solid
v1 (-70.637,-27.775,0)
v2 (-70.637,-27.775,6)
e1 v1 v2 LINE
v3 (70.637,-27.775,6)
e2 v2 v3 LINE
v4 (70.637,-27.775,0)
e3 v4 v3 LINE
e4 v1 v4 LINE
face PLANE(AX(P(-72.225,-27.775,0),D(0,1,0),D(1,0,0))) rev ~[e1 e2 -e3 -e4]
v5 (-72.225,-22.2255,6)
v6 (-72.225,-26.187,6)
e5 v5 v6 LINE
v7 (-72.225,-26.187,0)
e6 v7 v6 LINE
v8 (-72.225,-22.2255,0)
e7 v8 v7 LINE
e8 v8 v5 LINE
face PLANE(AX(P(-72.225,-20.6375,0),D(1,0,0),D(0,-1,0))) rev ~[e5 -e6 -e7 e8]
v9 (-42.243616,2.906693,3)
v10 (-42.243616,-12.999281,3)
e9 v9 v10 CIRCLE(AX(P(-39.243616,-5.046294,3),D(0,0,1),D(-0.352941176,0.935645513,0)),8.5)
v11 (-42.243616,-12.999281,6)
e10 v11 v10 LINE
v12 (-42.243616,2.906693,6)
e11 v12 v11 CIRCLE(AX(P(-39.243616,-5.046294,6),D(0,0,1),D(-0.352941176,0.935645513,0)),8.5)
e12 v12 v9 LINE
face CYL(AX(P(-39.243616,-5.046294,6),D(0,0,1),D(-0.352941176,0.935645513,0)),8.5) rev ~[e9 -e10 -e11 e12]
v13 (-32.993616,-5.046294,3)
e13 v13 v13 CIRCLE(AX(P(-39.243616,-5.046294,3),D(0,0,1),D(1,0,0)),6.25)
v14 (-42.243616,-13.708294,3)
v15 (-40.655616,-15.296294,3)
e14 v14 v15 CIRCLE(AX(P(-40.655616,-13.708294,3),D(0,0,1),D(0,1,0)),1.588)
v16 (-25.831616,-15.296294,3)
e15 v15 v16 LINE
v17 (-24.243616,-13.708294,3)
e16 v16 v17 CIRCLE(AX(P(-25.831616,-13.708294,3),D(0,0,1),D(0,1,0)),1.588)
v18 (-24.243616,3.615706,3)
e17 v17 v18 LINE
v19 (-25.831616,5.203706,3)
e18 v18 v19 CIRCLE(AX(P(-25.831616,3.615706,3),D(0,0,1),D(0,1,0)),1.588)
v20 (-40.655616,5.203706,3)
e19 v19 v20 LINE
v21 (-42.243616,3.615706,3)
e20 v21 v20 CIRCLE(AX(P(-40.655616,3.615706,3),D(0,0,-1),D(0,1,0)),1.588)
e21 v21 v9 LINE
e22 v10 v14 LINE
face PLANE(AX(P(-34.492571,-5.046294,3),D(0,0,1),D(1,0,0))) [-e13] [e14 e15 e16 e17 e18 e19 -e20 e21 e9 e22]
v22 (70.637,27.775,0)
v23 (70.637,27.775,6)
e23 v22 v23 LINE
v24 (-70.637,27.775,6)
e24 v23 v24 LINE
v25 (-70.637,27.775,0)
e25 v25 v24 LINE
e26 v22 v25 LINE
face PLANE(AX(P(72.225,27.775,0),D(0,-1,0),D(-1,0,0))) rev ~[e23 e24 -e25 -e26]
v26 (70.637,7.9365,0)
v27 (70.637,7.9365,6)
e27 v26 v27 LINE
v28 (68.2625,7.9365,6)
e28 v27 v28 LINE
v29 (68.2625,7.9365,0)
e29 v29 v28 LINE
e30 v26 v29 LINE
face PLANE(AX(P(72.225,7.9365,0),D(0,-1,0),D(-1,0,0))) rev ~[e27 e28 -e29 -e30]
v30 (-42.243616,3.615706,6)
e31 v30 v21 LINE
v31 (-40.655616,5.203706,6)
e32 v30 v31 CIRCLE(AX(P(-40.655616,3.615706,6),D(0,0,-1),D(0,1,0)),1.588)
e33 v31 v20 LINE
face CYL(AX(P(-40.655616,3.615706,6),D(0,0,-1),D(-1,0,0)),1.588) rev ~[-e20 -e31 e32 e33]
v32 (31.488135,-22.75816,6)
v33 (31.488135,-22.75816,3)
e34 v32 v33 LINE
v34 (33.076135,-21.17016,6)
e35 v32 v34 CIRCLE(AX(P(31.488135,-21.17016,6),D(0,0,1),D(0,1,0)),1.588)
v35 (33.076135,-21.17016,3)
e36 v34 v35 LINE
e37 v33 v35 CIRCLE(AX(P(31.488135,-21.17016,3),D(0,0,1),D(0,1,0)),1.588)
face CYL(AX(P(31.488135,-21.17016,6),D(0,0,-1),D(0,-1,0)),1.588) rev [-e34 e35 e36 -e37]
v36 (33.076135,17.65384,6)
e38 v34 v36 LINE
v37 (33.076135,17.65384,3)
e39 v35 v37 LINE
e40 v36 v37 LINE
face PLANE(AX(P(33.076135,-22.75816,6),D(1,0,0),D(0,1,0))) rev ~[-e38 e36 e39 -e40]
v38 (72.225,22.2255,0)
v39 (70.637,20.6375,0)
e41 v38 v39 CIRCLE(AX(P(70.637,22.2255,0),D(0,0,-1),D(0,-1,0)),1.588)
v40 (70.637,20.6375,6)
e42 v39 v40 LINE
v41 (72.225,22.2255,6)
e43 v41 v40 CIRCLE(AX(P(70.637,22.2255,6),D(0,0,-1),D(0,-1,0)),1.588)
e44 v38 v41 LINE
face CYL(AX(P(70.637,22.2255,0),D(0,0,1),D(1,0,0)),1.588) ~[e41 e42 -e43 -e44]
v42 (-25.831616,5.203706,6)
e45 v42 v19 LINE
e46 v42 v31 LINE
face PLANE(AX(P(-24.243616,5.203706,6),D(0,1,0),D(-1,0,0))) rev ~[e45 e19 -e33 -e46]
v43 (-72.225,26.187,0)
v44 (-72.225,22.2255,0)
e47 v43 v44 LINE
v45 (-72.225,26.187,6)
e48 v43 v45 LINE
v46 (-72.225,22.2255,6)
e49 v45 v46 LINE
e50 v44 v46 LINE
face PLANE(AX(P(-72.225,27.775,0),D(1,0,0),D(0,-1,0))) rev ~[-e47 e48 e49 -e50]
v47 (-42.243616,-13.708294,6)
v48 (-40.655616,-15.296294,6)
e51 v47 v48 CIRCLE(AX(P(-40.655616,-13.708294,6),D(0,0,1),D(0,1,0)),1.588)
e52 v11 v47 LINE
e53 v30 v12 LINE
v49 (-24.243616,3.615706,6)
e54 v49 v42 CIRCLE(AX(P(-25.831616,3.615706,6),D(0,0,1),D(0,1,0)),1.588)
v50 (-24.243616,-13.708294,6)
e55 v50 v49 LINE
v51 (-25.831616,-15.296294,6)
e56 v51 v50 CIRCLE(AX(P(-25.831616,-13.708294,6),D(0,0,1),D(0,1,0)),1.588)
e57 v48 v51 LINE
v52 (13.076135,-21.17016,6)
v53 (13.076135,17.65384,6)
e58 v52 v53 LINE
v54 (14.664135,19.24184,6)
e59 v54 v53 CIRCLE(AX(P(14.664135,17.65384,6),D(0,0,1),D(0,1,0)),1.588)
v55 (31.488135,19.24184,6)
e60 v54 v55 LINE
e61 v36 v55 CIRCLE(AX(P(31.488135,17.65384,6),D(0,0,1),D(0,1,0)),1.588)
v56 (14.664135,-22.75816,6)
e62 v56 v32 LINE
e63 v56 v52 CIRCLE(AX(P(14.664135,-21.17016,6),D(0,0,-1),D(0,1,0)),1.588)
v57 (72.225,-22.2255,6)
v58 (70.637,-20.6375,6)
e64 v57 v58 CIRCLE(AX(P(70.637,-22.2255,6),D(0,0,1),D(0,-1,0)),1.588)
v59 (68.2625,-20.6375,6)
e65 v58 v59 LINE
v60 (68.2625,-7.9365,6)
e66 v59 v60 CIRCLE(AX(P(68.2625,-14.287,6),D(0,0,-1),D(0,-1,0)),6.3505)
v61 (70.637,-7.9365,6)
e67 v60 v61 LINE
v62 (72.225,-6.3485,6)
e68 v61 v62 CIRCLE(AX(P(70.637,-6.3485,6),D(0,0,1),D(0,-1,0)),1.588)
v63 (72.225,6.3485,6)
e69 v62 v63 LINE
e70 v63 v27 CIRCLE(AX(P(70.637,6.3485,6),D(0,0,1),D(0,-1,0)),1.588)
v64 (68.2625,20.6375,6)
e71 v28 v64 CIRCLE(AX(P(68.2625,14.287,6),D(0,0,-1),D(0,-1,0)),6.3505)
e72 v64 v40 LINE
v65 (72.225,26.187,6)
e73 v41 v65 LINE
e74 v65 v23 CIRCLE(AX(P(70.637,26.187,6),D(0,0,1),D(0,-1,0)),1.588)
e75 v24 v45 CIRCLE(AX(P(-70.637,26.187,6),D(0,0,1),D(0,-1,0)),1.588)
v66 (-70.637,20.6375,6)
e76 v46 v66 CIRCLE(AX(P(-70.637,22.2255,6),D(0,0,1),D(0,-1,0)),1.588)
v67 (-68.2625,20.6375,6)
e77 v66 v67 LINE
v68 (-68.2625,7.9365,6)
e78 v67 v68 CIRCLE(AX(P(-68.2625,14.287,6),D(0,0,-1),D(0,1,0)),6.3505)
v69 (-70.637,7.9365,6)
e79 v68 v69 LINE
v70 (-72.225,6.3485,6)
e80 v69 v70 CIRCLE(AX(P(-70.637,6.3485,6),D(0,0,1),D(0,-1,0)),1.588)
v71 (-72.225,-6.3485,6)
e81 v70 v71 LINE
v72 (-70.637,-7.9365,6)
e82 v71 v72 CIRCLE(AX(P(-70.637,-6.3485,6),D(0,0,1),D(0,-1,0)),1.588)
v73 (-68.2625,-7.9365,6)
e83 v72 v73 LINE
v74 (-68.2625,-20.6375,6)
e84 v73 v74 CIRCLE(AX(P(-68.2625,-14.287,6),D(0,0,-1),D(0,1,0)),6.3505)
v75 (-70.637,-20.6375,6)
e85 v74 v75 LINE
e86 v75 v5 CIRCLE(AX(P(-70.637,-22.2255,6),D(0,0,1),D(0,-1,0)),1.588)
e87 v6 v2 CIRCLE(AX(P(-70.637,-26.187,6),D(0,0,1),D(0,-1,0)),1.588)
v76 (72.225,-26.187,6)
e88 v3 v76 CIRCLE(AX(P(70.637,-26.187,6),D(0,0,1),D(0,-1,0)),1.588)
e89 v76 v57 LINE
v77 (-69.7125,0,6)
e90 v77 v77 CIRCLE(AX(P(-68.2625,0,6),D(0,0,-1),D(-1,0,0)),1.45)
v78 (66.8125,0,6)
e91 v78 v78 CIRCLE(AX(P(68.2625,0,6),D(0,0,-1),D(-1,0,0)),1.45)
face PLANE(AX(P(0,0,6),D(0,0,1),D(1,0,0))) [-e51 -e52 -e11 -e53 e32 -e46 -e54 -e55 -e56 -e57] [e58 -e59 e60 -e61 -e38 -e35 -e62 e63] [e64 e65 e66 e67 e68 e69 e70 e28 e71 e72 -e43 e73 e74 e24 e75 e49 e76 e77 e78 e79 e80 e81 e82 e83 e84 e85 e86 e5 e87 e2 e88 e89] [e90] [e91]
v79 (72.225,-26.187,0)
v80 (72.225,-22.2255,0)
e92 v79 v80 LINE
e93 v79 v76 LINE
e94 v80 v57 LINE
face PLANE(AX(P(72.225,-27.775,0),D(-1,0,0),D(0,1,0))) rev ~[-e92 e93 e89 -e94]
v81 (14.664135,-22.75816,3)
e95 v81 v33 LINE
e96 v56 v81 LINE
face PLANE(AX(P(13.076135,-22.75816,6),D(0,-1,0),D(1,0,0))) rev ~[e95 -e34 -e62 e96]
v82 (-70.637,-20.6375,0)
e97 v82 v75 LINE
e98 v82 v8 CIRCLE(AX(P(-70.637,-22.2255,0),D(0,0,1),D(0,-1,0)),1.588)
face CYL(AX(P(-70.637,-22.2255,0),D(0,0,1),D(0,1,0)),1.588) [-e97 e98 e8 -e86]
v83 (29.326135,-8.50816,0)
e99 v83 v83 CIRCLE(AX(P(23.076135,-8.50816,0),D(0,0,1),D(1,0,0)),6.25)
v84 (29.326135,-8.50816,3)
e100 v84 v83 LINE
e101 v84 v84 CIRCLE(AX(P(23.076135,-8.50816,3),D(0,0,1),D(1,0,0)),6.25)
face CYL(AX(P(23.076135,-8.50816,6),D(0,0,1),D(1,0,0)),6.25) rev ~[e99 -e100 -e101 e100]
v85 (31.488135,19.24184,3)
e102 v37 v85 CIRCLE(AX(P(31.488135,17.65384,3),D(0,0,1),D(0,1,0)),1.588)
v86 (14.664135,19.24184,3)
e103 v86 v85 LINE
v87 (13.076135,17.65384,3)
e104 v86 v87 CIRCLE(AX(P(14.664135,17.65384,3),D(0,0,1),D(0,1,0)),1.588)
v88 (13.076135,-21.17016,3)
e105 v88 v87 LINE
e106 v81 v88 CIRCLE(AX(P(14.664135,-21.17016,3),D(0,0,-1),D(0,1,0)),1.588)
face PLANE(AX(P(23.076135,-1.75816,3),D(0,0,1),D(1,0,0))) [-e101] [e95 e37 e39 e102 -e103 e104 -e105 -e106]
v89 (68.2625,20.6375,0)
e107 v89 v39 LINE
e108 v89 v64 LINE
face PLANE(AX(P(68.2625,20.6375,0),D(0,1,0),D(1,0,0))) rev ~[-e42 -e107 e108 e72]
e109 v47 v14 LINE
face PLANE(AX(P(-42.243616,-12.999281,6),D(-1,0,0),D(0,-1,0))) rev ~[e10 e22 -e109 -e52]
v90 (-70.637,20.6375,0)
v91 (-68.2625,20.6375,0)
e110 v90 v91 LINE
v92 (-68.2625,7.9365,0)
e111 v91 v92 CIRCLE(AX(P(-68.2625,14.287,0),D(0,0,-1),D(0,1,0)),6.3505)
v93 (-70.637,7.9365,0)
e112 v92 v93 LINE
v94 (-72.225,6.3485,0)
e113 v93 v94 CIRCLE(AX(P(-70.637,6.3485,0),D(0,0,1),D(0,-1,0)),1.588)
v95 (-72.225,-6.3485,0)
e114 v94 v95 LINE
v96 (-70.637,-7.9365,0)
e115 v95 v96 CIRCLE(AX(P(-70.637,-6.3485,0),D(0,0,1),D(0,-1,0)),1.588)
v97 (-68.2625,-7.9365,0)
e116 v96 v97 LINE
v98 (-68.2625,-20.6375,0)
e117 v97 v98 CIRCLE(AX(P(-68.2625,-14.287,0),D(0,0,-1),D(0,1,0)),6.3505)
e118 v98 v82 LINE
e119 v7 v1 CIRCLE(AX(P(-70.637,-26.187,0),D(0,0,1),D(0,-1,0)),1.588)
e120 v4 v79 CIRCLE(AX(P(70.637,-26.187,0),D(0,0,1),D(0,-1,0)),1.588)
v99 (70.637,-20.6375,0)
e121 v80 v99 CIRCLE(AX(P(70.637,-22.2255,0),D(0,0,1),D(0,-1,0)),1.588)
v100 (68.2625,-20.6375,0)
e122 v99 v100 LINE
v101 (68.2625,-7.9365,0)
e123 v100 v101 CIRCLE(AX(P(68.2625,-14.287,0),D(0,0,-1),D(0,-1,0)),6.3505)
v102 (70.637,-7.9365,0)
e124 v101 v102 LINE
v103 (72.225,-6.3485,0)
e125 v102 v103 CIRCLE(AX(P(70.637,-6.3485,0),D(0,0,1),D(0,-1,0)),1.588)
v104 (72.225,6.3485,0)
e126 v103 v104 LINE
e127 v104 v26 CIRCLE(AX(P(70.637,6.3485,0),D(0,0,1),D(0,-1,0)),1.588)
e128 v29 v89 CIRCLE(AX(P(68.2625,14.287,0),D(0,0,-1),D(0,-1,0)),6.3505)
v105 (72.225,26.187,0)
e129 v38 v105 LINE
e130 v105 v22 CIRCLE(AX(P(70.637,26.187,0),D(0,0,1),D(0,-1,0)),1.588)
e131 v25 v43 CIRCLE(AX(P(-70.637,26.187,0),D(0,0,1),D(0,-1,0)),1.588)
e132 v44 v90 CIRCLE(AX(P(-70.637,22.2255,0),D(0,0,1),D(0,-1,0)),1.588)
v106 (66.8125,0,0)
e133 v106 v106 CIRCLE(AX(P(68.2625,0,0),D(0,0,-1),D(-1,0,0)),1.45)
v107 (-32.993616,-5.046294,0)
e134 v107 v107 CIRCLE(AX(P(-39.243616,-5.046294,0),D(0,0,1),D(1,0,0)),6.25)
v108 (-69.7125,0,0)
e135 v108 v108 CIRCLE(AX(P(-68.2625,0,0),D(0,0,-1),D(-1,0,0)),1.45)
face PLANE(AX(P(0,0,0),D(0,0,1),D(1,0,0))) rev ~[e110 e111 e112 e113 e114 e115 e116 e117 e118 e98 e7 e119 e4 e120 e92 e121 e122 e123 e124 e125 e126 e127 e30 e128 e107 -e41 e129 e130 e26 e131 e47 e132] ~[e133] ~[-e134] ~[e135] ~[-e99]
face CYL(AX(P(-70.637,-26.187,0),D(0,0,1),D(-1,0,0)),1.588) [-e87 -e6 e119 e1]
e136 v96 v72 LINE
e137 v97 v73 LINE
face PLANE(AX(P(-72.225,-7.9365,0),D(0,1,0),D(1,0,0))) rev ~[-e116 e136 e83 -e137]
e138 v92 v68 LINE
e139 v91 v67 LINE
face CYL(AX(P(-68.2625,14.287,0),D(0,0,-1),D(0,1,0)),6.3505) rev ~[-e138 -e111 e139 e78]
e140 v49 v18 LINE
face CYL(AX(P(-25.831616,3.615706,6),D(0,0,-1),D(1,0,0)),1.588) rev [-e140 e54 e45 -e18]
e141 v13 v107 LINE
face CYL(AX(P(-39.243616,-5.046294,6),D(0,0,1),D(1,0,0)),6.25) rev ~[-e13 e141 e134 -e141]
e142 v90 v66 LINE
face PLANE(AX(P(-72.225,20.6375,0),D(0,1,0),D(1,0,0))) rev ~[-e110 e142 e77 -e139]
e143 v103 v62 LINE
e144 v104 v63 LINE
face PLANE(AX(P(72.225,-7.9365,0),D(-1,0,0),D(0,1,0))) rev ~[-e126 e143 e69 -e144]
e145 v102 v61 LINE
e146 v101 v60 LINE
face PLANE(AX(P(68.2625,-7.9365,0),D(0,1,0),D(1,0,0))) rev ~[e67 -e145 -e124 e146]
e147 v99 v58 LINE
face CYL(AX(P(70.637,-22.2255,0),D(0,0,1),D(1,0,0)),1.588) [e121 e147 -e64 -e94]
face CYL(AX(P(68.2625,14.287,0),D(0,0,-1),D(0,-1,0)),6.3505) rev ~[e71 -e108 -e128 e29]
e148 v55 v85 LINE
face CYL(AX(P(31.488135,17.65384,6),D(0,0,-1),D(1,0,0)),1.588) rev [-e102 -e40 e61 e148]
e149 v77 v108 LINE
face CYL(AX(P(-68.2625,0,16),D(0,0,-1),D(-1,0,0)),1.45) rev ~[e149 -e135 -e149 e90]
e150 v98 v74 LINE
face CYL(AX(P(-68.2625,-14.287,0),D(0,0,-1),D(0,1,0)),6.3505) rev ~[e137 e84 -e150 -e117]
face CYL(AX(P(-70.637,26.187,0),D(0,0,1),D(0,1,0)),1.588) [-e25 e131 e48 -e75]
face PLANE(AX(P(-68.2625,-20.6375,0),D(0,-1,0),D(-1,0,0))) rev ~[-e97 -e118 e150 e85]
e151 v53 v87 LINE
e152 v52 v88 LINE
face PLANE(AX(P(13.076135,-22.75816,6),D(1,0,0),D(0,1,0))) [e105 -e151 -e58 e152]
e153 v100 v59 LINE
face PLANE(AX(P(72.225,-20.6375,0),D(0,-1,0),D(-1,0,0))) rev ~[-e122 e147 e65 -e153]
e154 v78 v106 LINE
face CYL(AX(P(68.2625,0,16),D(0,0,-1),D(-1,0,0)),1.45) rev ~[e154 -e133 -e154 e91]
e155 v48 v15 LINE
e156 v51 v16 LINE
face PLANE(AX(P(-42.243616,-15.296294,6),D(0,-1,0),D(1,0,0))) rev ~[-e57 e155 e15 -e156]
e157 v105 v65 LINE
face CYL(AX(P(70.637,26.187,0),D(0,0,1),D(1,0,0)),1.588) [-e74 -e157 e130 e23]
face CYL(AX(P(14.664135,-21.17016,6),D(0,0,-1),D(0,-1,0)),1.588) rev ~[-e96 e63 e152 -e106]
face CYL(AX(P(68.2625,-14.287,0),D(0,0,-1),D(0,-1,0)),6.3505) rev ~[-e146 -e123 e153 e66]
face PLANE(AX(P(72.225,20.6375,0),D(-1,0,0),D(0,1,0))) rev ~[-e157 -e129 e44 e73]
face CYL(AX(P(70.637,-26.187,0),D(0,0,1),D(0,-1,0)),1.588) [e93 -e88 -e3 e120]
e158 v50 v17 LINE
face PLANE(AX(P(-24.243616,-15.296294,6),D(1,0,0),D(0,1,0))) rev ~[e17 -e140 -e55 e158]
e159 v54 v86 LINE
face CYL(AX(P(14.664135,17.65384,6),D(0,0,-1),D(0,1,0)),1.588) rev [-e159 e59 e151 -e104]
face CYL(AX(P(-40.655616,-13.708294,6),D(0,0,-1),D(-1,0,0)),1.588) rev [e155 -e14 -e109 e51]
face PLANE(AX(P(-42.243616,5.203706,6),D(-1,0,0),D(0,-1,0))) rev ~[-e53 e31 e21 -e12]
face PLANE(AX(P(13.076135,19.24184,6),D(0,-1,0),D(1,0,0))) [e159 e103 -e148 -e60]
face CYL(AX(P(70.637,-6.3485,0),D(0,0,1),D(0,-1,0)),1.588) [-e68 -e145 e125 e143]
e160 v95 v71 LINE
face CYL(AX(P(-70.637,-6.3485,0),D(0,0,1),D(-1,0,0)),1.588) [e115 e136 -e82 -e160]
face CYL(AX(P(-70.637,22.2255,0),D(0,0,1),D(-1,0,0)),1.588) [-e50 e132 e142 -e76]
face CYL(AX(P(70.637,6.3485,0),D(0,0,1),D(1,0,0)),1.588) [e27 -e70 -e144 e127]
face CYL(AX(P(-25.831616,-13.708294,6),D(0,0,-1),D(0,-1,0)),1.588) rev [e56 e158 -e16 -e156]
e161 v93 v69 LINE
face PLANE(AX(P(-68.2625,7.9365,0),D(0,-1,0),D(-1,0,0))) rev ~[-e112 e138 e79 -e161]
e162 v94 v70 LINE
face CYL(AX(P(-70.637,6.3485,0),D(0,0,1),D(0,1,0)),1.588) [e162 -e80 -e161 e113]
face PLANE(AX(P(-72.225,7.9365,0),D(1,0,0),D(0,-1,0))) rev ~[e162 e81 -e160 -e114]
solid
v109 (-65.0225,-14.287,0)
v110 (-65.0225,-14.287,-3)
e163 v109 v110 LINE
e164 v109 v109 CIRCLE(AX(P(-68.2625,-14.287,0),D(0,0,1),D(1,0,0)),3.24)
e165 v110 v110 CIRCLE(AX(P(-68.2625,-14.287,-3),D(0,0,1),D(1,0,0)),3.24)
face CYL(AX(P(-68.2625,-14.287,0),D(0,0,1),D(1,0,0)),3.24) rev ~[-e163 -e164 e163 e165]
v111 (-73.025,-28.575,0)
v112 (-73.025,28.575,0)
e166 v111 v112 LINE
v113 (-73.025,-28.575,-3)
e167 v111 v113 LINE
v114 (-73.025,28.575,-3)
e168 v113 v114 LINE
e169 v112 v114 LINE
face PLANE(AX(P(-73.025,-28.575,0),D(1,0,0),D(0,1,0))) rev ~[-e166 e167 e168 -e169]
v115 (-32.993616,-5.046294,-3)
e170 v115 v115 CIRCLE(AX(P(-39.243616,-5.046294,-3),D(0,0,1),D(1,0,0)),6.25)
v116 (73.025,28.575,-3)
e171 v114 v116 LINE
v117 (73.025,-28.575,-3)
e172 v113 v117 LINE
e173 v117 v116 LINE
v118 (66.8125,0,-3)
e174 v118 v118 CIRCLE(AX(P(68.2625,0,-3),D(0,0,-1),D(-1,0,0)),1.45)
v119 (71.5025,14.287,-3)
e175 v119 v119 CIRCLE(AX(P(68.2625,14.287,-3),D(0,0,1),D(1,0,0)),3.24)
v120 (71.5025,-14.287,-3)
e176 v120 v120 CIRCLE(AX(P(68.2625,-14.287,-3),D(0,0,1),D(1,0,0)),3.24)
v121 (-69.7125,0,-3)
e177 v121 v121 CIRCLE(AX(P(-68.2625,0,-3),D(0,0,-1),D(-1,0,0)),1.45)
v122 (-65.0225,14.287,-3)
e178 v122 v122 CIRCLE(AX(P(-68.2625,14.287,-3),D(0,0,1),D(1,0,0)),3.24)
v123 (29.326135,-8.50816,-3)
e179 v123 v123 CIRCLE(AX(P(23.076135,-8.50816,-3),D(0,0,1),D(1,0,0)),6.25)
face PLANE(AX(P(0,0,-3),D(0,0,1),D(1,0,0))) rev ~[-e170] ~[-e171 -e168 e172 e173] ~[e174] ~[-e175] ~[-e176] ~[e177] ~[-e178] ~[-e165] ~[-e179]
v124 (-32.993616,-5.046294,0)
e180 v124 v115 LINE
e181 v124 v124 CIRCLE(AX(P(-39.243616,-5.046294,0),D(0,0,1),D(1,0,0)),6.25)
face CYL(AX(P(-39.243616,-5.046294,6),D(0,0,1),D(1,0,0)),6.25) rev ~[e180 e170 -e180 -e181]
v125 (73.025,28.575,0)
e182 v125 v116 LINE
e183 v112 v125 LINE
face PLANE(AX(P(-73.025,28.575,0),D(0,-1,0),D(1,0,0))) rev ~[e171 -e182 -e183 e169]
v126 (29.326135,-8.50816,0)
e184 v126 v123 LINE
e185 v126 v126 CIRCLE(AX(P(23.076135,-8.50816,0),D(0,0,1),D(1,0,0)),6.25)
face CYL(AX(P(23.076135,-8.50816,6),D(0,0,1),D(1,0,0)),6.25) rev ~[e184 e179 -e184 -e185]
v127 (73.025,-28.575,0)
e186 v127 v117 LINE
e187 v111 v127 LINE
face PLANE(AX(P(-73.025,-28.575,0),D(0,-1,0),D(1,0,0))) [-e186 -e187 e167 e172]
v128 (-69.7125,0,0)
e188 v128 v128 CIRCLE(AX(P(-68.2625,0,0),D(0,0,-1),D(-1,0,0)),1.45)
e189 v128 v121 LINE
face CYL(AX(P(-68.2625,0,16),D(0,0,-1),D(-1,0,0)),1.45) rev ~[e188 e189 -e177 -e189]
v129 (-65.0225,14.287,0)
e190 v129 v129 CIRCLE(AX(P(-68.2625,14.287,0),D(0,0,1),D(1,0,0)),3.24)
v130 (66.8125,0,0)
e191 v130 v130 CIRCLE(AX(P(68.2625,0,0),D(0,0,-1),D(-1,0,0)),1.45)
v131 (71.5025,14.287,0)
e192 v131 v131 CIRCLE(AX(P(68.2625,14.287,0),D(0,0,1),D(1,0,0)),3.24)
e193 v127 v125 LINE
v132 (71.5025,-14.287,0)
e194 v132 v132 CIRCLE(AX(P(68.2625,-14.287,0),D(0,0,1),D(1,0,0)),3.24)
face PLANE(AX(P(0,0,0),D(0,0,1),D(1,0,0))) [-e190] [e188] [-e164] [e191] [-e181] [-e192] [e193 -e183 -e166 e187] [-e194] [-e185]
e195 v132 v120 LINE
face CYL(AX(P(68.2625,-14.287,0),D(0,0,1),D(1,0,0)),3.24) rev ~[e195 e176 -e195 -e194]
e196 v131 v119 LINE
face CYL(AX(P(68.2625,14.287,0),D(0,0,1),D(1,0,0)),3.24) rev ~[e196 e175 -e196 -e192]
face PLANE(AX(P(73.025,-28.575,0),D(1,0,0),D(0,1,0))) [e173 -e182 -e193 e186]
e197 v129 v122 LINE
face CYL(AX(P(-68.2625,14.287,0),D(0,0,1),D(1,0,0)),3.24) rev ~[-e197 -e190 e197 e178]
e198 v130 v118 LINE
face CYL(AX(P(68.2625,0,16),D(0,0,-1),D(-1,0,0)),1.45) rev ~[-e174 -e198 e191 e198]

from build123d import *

# Parameters (mm, degrees)
F0_W        = 146.05
F0_H        = 57.15
F0_R        = 3.24
F1_DEPTH    = 3
F2_DEPTH    = 6
F3_R        = 1.588
F5_W        = 20
F5_H        = 42
F5_R        = 6.25
F6_DEPTH    = 3
F7_DEPTH    = 25
F8_R        = 1.588
F10_D       = 2.9
F10_DEPTH   = 10
F10_TIP     = 0.8712478976
F10_2_D     = 2.9
F10_2_DEPTH = 10
F10_2_TIP   = 0.8712478976


with BuildPart() as f1:
    # F0 (on Top) → F1 (new body)
    with BuildSketch(Plane.XY):
        Rectangle(F0_W, F0_H)
        with Locations((-68.2625, -14.287)):
            Circle(F0_R, mode=Mode.SUBTRACT)
        with Locations((68.2625, -14.287)):
            Circle(F0_R, mode=Mode.SUBTRACT)
        with Locations((-68.2625, 14.287)):
            Circle(F0_R, mode=Mode.SUBTRACT)
        with BuildLine():
            Line((-72.225, 27.775), (72.225, 27.775))
            Line((72.225, 27.775), (72.225, 20.6375))
            Line((72.225, 20.6375), (68.2625, 20.6375))
            ThreePointArc((68.2625, 20.6375), (61.912, 14.287), (68.2625, 7.9365))
            Line((68.2625, 7.9365), (72.225, 7.9365))
            Line((72.225, 7.9365), (72.225, -7.9365))
            Line((72.225, -7.9365), (68.2625, -7.9365))
            ThreePointArc((68.2625, -7.9365), (61.912, -14.287), (68.2625, -20.6375))
            Line((68.2625, -20.6375), (72.225, -20.6375))
            Line((72.225, -20.6375), (72.225, -27.775))
            Line((72.225, -27.775), (-72.225, -27.775))
            Line((-72.225, -27.775), (-72.225, -20.6375))
            Line((-72.225, -20.6375), (-68.2625, -20.6375))
            ThreePointArc((-68.2625, -20.6375), (-61.912, -14.287), (-68.2625, -7.9365))
            Line((-68.2625, -7.9365), (-72.225, -7.9365))
            Line((-72.225, -7.9365), (-72.225, 7.9365))
            Line((-72.225, 7.9365), (-68.2625, 7.9365))
            ThreePointArc((-68.2625, 7.9365), (-61.912, 14.287), (-68.2625, 20.6375))
            Line((-68.2625, 20.6375), (-72.225, 20.6375))
            Line((-72.225, 20.6375), (-72.225, 27.775))
        make_face(mode=Mode.SUBTRACT)
        with Locations((68.2625, 14.287)):
            Circle(F0_R, mode=Mode.SUBTRACT)
        with BuildLine():
            Line((72.225, 20.6375), (72.225, 27.775))
            Line((72.225, 27.775), (-72.225, 27.775))
            Line((-72.225, 27.775), (-72.225, 20.6375))
            Line((-72.225, 20.6375), (-68.2625, 20.6375))
            ThreePointArc((-68.2625, 20.6375), (-61.912, 14.287), (-68.2625, 7.9365))
            Line((-68.2625, 7.9365), (-72.225, 7.9365))
            Line((-72.225, 7.9365), (-72.225, -7.9365))
            Line((-72.225, -7.9365), (-68.2625, -7.9365))
            ThreePointArc((-68.2625, -7.9365), (-61.912, -14.287), (-68.2625, -20.6375))
            Line((-68.2625, -20.6375), (-72.225, -20.6375))
            Line((-72.225, -20.6375), (-72.225, -27.775))
            Line((-72.225, -27.775), (72.225, -27.775))
            Line((72.225, -27.775), (72.225, -20.6375))
            Line((72.225, -20.6375), (68.2625, -20.6375))
            ThreePointArc((68.2625, -20.6375), (61.912, -14.287), (68.2625, -7.9365))
            Line((68.2625, -7.9365), (72.225, -7.9365))
            Line((72.225, -7.9365), (72.225, 7.9365))
            Line((72.225, 7.9365), (68.2625, 7.9365))
            ThreePointArc((68.2625, 7.9365), (61.912, 14.287), (68.2625, 20.6375))
            Line((68.2625, 20.6375), (72.225, 20.6375))
        make_face()
    extrude(amount=-F1_DEPTH)


with BuildPart() as f2:
    # F0 (on Top) → F2 (new body)
    with BuildSketch(Plane.XY):
        with BuildLine():
            Line((72.225, 20.6375), (72.225, 27.775))
            Line((72.225, 27.775), (-72.225, 27.775))
            Line((-72.225, 27.775), (-72.225, 20.6375))
            Line((-72.225, 20.6375), (-68.2625, 20.6375))
            ThreePointArc((-68.2625, 20.6375), (-61.912, 14.287), (-68.2625, 7.9365))
            Line((-68.2625, 7.9365), (-72.225, 7.9365))
            Line((-72.225, 7.9365), (-72.225, -7.9365))
            Line((-72.225, -7.9365), (-68.2625, -7.9365))
            ThreePointArc((-68.2625, -7.9365), (-61.912, -14.287), (-68.2625, -20.6375))
            Line((-68.2625, -20.6375), (-72.225, -20.6375))
            Line((-72.225, -20.6375), (-72.225, -27.775))
            Line((-72.225, -27.775), (72.225, -27.775))
            Line((72.225, -27.775), (72.225, -20.6375))
            Line((72.225, -20.6375), (68.2625, -20.6375))
            ThreePointArc((68.2625, -20.6375), (61.912, -14.287), (68.2625, -7.9365))
            Line((68.2625, -7.9365), (72.225, -7.9365))
            Line((72.225, -7.9365), (72.225, 7.9365))
            Line((72.225, 7.9365), (68.2625, 7.9365))
            ThreePointArc((68.2625, 7.9365), (61.912, 14.287), (68.2625, 20.6375))
            Line((68.2625, 20.6375), (72.225, 20.6375))
        make_face()
    extrude(amount=F2_DEPTH)

    # F3
    f3_edges = [f2.edges().sort_by_distance(p)[0] for p in [
        (-72.225, 27.775, 3),
        (-72.225, 20.6375, 3),
        (-72.225, 7.9365, 3),
        (-72.225, -7.9365, 3),
        (-72.225, -20.6375, 3),
        (-72.225, -27.775, 3),
        (72.225, 20.6375, 3),
        (72.225, -7.9365, 3),
        (72.225, -27.775, 3),
        (72.225, -20.6375, 3),
        (72.225, 7.9365, 3),
        (72.225, 27.775, 3),
    ]]
    fillet(f3_edges, radius=F3_R)

    # F5 (on face) → F6 (cut)
    with BuildSketch(Plane.XY.offset(6)):
        with Locations((23.0761349574, -1.7581597865)):
            Rectangle(F5_W, F5_H)
        with Locations((23.0761349574, -8.5081597865)):
            Circle(F5_R, mode=Mode.SUBTRACT)
        with BuildLine():
            Line((-42.2436161637, 5.2037057467), (-42.2436161637, 2.906692607))
            ThreePointArc((-42.2436161637, 2.906692607), (-47.7436161637, -5.0462942533), (-42.2436161637, -12.9992811136))
            Line((-42.2436161637, -12.9992811136), (-42.2436161637, -15.2962942533))
            Line((-42.2436161637, -15.2962942533), (-24.2436161637, -15.2962942533))
            Line((-24.2436161637, -15.2962942533), (-24.2436161637, 5.2037057467))
            Line((-24.2436161637, 5.2037057467), (-42.2436161637, 5.2037057467))
        make_face()
        with Locations((-39.2436161637, -5.0462942533)):
            Circle(F5_R, mode=Mode.SUBTRACT)
    extrude(amount=-F6_DEPTH, mode=Mode.SUBTRACT)


with BuildPart() as f7_tool:
    # F5 (on face) → F7 (new body)
    with BuildSketch(Plane.XY.offset(6)):
        with Locations((23.0761349574, -8.5081597865)):
            Circle(F5_R)
        with Locations((-39.2436161637, -5.0462942533)):
            Circle(F5_R)
    extrude(amount=-F7_DEPTH)


with BuildPart() as f1_1:
    add(f1.part)

    # F7: cut by f7_tool
    add(f7_tool.part, mode=Mode.SUBTRACT)

    # F10
    with Locations(Plane.XY.offset(6)):
        with Locations((-68.2625, 0), (68.2625, 0)):
            Hole(F10_D / 2, depth=F10_DEPTH)
            with Locations((0, 0, -(F10_DEPTH + F10_TIP / 2))):  # 118° drill point
                Cone(0, F10_D / 2, F10_TIP, mode=Mode.SUBTRACT)


with BuildPart() as f2_1:
    add(f2.part)

    # F7: cut by f7_tool
    add(f7_tool.part, mode=Mode.SUBTRACT)

    # F8
    f8_edges = [f2_1.edges().sort_by_distance(p)[0] for p in [
        (-42.243616, 5.203706, 4.5),
        (-24.243616, 5.203706, 4.5),
        (-24.243616, -15.296294, 4.5),
        (13.076135, 19.24184, 4.5),
        (33.076135, 19.24184, 4.5),
        (13.076135, -22.75816, 4.5),
        (33.076135, -22.75816, 4.5),
        (-42.243616, -15.296294, 4.5),
    ]]
    fillet(f8_edges, radius=F8_R)

    # F10#2
    with Locations(Plane.XY.offset(6)):
        with Locations((-68.2625, 0), (68.2625, 0)):
            Hole(F10_2_D / 2, depth=F10_2_DEPTH)
            with Locations((0, 0, -(F10_2_DEPTH + F10_2_TIP / 2))):  # 118° drill point
                Cone(0, F10_2_D / 2, F10_2_TIP, mode=Mode.SUBTRACT)


solid = Compound([f1_1.part, f2_1.part])
